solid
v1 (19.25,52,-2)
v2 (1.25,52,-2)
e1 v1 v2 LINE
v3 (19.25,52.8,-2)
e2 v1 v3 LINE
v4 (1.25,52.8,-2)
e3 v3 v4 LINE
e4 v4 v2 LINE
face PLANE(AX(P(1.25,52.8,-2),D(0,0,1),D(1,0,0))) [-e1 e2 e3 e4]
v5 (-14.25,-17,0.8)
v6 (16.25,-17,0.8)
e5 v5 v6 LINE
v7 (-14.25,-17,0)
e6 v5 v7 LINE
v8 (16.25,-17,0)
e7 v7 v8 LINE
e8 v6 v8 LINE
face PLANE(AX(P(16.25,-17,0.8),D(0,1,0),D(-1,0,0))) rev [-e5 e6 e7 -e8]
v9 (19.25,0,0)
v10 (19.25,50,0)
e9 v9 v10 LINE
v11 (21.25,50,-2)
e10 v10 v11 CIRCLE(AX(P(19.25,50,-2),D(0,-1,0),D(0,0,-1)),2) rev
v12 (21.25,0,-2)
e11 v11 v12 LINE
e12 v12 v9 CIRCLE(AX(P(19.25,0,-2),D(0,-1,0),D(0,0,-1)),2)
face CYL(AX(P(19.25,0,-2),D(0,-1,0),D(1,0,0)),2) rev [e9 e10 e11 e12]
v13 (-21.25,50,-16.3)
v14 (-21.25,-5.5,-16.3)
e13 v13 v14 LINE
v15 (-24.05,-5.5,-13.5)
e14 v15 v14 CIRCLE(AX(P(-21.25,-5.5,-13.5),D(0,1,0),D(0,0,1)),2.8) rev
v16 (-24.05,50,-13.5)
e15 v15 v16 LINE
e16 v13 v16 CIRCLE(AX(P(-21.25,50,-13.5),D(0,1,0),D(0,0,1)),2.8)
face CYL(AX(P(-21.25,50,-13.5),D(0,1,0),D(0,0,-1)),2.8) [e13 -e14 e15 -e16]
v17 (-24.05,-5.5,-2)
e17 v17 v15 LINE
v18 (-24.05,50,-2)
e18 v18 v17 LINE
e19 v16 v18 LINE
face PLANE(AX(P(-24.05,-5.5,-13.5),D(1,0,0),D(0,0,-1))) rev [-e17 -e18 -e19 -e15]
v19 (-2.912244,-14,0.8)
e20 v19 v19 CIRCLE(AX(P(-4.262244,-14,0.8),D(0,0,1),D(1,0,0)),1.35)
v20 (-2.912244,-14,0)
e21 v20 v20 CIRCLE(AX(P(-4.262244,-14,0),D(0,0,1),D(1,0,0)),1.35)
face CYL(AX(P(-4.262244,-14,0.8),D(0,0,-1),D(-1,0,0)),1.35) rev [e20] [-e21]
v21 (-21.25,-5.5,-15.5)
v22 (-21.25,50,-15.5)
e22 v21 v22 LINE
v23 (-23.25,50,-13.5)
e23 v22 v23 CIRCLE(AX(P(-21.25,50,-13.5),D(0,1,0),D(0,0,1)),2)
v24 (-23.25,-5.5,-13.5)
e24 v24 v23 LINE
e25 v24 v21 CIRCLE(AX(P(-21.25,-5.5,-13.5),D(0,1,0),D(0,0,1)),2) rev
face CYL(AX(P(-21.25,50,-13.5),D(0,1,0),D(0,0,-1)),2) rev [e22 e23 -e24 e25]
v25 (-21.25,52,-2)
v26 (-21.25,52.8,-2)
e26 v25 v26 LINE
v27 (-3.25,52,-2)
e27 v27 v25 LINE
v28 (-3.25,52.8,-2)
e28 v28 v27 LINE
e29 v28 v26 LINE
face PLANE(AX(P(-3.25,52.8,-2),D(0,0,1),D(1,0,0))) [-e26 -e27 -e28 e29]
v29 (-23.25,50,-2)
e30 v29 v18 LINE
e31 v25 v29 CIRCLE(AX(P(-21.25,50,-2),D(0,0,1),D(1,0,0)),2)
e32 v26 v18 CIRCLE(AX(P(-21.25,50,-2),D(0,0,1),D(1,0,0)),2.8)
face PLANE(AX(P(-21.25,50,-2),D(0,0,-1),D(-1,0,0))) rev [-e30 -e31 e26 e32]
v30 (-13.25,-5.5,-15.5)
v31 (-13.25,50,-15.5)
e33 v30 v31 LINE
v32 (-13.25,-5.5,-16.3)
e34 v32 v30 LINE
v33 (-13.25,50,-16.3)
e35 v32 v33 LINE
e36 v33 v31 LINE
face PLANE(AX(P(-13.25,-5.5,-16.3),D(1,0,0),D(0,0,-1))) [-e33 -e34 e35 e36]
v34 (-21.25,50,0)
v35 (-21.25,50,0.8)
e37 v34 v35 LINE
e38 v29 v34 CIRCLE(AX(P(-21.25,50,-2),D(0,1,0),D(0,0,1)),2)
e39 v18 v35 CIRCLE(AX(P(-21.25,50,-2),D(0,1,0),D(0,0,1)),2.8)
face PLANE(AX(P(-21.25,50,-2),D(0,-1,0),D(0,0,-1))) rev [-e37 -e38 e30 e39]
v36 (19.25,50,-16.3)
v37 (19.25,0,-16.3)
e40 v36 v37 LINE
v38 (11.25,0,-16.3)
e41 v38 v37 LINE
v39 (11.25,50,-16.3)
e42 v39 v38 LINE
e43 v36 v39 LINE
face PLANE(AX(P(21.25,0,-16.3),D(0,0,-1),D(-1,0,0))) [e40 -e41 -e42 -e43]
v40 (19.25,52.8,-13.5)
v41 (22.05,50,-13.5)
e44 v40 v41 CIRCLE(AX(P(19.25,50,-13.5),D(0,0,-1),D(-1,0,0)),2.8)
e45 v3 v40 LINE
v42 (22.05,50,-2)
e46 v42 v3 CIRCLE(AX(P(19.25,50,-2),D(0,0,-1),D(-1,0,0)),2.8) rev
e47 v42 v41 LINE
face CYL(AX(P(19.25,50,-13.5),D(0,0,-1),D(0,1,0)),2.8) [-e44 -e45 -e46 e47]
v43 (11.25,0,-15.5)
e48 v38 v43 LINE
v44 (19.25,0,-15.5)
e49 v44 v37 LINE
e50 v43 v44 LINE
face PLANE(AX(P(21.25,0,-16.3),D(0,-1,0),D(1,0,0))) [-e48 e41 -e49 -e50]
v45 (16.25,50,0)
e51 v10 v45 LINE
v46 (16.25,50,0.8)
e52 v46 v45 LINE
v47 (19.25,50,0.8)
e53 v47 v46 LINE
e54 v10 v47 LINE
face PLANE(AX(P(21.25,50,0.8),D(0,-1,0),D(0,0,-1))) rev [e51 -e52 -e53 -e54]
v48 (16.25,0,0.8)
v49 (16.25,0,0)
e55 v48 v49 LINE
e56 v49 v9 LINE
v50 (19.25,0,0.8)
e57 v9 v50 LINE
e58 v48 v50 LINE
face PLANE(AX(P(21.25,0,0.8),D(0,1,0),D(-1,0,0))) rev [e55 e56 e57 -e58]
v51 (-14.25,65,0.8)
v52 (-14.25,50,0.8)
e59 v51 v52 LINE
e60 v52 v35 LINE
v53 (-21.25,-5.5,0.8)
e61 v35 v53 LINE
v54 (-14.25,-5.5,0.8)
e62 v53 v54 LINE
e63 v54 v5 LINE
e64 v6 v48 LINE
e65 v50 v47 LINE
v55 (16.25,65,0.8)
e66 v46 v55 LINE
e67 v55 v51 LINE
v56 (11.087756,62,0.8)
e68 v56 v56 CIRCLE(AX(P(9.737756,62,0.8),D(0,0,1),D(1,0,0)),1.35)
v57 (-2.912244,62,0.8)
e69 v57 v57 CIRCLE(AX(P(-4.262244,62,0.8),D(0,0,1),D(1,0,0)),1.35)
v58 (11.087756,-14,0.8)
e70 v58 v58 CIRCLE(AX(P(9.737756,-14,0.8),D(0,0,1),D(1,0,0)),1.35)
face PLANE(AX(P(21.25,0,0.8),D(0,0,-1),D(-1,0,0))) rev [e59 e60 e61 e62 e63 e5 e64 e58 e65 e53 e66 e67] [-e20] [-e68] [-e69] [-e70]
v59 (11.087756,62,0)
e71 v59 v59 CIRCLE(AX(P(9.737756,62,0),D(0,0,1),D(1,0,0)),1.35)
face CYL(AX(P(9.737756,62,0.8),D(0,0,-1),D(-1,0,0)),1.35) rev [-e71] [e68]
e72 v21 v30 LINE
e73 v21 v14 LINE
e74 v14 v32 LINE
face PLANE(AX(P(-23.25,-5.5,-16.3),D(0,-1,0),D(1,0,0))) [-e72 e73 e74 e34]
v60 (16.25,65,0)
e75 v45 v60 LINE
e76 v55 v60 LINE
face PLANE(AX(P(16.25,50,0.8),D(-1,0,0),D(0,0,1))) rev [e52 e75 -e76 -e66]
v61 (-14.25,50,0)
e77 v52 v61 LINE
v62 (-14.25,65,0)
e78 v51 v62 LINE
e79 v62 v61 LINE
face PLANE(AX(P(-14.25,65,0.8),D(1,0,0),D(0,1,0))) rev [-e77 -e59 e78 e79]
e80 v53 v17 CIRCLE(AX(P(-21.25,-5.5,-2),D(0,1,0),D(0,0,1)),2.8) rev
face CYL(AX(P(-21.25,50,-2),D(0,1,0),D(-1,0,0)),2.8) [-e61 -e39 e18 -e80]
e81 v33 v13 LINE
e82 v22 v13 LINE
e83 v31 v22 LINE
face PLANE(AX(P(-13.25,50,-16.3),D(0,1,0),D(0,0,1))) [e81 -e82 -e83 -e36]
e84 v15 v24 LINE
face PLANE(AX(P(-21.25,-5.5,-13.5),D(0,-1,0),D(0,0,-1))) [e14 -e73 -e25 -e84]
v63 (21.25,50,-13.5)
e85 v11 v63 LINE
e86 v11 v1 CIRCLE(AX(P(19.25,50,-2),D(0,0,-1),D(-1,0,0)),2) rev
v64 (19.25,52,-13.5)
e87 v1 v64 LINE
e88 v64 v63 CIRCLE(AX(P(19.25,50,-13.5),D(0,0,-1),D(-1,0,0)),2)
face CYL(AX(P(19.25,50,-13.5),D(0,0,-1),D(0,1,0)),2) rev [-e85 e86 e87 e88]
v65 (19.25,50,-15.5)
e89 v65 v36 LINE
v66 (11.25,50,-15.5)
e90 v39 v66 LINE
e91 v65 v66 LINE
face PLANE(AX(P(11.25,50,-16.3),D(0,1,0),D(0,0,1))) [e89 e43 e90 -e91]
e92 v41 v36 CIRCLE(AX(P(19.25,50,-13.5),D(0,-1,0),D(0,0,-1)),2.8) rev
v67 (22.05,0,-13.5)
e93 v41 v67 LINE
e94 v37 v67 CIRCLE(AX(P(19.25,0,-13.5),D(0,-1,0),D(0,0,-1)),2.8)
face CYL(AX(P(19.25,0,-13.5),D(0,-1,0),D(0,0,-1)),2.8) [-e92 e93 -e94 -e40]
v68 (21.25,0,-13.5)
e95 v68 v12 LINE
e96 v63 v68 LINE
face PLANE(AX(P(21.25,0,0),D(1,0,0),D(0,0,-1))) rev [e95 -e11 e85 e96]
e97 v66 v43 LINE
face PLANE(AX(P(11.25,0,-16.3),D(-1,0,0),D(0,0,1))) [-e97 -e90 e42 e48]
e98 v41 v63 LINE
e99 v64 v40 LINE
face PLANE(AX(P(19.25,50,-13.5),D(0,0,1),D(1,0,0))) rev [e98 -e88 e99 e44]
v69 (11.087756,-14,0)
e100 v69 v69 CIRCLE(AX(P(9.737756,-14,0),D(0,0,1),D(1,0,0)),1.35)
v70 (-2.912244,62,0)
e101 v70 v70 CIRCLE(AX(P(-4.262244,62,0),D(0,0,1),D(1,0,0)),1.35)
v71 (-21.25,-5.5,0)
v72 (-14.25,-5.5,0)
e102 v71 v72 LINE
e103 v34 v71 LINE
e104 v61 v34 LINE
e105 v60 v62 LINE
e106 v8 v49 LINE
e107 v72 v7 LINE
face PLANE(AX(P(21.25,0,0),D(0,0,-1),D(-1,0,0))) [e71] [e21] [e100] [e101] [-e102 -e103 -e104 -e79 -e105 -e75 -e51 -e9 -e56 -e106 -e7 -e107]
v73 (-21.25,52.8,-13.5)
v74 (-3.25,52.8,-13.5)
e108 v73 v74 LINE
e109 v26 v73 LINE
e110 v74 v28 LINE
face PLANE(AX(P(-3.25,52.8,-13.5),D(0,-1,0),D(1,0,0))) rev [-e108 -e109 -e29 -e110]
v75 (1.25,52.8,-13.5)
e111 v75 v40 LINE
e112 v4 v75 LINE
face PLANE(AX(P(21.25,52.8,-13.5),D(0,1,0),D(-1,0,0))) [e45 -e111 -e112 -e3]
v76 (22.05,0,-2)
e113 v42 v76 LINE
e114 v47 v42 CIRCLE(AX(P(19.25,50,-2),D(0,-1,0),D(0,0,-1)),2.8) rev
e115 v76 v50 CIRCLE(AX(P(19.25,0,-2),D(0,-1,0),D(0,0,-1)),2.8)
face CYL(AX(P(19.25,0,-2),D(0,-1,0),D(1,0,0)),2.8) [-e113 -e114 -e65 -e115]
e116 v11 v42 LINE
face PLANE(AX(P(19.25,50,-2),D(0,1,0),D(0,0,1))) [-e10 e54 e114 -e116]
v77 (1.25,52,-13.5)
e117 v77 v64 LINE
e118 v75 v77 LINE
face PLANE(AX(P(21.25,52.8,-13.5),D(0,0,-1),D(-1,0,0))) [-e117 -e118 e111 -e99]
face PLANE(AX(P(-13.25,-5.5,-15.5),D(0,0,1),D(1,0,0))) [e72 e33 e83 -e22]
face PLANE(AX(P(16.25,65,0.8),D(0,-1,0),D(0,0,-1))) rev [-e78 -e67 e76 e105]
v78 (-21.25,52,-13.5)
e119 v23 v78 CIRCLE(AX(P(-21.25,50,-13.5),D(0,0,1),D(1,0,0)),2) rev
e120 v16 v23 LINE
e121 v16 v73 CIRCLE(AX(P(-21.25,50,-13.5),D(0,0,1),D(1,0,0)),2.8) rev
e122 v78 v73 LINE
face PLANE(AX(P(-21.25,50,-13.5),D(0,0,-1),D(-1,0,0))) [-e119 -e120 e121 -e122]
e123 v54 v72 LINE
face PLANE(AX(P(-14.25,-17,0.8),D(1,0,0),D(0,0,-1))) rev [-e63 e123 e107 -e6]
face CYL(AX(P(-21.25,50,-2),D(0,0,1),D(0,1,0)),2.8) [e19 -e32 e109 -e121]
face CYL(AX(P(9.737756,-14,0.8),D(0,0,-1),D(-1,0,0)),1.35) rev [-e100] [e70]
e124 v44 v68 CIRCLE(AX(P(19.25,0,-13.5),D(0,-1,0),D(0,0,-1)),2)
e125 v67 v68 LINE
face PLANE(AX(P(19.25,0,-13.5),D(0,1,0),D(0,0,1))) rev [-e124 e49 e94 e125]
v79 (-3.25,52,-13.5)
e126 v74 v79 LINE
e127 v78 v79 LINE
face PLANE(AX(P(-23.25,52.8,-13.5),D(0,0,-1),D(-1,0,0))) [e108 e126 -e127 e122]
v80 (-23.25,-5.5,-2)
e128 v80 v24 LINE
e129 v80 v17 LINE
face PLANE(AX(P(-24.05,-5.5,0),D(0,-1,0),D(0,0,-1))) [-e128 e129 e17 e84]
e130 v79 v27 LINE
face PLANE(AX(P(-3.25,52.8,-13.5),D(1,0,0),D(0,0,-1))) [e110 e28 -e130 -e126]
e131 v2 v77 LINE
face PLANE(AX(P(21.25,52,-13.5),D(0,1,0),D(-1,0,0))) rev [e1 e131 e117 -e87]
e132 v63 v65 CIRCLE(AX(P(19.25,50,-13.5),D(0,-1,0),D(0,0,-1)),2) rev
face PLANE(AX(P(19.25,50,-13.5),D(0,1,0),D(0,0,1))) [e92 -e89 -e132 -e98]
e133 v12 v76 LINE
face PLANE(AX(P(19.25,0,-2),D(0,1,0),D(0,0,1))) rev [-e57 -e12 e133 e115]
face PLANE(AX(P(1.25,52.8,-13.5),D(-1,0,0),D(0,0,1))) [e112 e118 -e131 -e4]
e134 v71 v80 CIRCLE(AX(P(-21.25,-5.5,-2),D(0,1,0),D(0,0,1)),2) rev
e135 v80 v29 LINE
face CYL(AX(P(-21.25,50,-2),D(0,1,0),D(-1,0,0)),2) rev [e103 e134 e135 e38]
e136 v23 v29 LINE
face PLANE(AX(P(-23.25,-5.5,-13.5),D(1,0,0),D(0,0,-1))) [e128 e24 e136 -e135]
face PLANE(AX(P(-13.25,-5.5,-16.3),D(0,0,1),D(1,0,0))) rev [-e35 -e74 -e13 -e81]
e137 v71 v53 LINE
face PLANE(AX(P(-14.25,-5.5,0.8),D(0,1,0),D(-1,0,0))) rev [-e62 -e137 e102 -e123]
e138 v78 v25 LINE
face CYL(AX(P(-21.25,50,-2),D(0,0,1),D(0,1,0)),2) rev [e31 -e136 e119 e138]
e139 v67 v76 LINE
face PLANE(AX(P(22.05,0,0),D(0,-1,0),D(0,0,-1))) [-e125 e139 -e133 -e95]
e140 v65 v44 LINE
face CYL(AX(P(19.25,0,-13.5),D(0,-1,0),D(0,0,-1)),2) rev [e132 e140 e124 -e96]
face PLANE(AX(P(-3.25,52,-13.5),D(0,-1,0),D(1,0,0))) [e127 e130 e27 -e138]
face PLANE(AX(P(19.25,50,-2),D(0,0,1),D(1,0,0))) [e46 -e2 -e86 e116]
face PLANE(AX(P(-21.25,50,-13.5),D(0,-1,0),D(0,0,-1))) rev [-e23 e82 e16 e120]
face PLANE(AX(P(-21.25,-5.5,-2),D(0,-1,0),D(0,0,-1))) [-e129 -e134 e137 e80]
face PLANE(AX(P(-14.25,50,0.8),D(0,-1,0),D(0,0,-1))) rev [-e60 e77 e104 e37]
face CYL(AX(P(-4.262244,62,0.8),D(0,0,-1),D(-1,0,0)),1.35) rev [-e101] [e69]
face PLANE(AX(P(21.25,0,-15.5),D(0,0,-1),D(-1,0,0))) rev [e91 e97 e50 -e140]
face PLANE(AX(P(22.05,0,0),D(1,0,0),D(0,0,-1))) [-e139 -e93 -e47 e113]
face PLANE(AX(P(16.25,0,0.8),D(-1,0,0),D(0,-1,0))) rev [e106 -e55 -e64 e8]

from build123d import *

# Parameters (mm, degrees)
SKETCH1_R                      = 1.35
BASE_FLANGE1_DEPTH             = 0.8
EDGE_FLANGE1_STRIP_W           = 7.2
EDGE_FLANGE1_STRIP_H           = 0.8
EDGE_FLANGE1_STRIP_CUT_DEPTH   = 50
EDGE_FLANGE1_STRIP_2_W         = 7.2
EDGE_FLANGE1_STRIP_2_H         = 0.8
EDGE_FLANGE1_STRIP_CUT_2_DEPTH = 55.5
EDGE_FLANGE1_DEPTH             = 50
EDGE_FLANGE1_BEND_DEPTH        = 55.5
EDGE_FLANGE4_DEPTH             = 11.5
EDGE_FLANGE4_BEND_DEPTH        = 11.5
EDGE_FLANGE5_DEPTH             = 50
EDGE_FLANGE5_BEND_DEPTH        = 55.5


# Sheet-metal steps are written as plain solids
with BuildPart() as part:
    # Sketch1 → Base-Flange1 (new body)
    with BuildSketch(Plane.XY):
        Polygon((16.25, 0), (16.25, -17), (-14.25, -17), (-14.25, -5.5), (-23.25, -5.5), (-23.25, 50), (-14.25, 50), (-14.25, 65), (16.25, 65), (16.25, 50), (21.25, 50), (21.25, 0), align=None)
        with Locations((9.737756115, -14)):
            Circle(SKETCH1_R, mode=Mode.SUBTRACT)
        with Locations((-4.262243885, -14)):
            Circle(SKETCH1_R, mode=Mode.SUBTRACT)
        with Locations((9.737756115, 62)):
            Circle(SKETCH1_R, mode=Mode.SUBTRACT)
        with Locations((-4.262243885, 62)):
            Circle(SKETCH1_R, mode=Mode.SUBTRACT)
    extrude(amount=BASE_FLANGE1_DEPTH)

    # Edge-Flange1 strip (across the edge) → Edge-Flange1 strip cut (cut)
    with BuildSketch(Plane(origin=(21.25, 50, 0), x_dir=(-1, 0, 0), z_dir=(0, -1, 0))):
        with Locations((-1.6, -0.4)):
            Rectangle(EDGE_FLANGE1_STRIP_W, EDGE_FLANGE1_STRIP_H)
    extrude(amount=EDGE_FLANGE1_STRIP_CUT_DEPTH, mode=Mode.SUBTRACT)

    # Edge-Flange1 strip 2 (across the edge) → Edge-Flange1 strip cut 2 (cut)
    with BuildSketch(Plane(origin=(-23.25, -5.5, 0), x_dir=(1, 0, 0), z_dir=(0, 1, 0))):
        with Locations((-1.6, -0.4)):
            Rectangle(EDGE_FLANGE1_STRIP_2_W, EDGE_FLANGE1_STRIP_2_H)
    extrude(amount=EDGE_FLANGE1_STRIP_CUT_2_DEPTH, mode=Mode.SUBTRACT)

    # Edge-Flange1 section (across the edge) → Edge-Flange1 (add)
    with BuildSketch(Plane(origin=(21.25, 50, 0), x_dir=(-1, 0, 0), z_dir=(0, -1, 0))):
        with BuildLine():
            Line((-0.8, 2), (-0.8, 13.5))
            Line((-0.8, 13.5), (0, 13.5))
            Line((0, 13.5), (0, 2))
            ThreePointArc((0, 2), (0.585786438, 0.585786438), (2, 0))
            Line((2, 0), (2, -0.8))
            ThreePointArc((2, -0.8), (0.020101013, 0.020101013), (-0.8, 2))
        make_face()
    extrude(amount=EDGE_FLANGE1_DEPTH)

    # Edge-Flange1 section 2 (across the edge) → Edge-Flange1 bend (add)
    with BuildSketch(Plane(origin=(-23.25, -5.5, 0), x_dir=(1, 0, 0), z_dir=(0, 1, 0))):
        with BuildLine():
            Line((-0.8, 2), (-0.8, 13.5))
            Line((-0.8, 13.5), (0, 13.5))
            Line((0, 13.5), (0, 2))
            ThreePointArc((0, 2), (0.585786438, 0.585786438), (2, 0))
            Line((2, 0), (2, -0.8))
            ThreePointArc((2, -0.8), (0.020101013, 0.020101013), (-0.8, 2))
        make_face()
    extrude(amount=EDGE_FLANGE1_BEND_DEPTH)

    # Edge-Flange4 section (across the edge) → Edge-Flange4 (add)
    with BuildSketch(Plane(origin=(21.25, 52, -2), x_dir=(0, -1, 0), z_dir=(0, 0, -1))):
        with BuildLine():
            Line((-0.8, 2), (-0.8, 20))
            Line((-0.8, 20), (0, 20))
            Line((0, 20), (0, 2))
            ThreePointArc((0, 2), (0.585786438, 0.585786438), (2, 0))
            Line((2, 0), (2, -0.8))
            ThreePointArc((2, -0.8), (0.020101013, 0.020101013), (-0.8, 2))
        make_face()
    extrude(amount=EDGE_FLANGE4_DEPTH)

    # Edge-Flange4 section 2 (across the edge) → Edge-Flange4 bend (add)
    with BuildSketch(Plane(origin=(-23.25, 52, -13.5), x_dir=(0, -1, 0), z_dir=(0, 0, 1))):
        with BuildLine():
            Line((-0.8, 2), (-0.8, 20))
            Line((-0.8, 20), (0, 20))
            Line((0, 20), (0, 2))
            ThreePointArc((0, 2), (0.585786438, 0.585786438), (2, 0))
            Line((2, 0), (2, -0.8))
            ThreePointArc((2, -0.8), (0.020101013, 0.020101013), (-0.8, 2))
        make_face()
    extrude(amount=EDGE_FLANGE4_BEND_DEPTH)

    # Edge-Flange5 section (across the edge) → Edge-Flange5 (add)
    with BuildSketch(Plane(origin=(21.25, 50, -15.5), x_dir=(0, 0, 1), z_dir=(0, -1, 0))):
        with BuildLine():
            Line((-0.8, 2), (-0.8, 10))
            Line((-0.8, 10), (0, 10))
            Line((0, 10), (0, 2))
            ThreePointArc((0, 2), (0.585786438, 0.585786438), (2, 0))
            Line((2, 0), (2, -0.8))
            ThreePointArc((2, -0.8), (0.020101013, 0.020101013), (-0.8, 2))
        make_face()
    extrude(amount=EDGE_FLANGE5_DEPTH)

    # Edge-Flange5 section 2 (across the edge) → Edge-Flange5 bend (add)
    with BuildSketch(Plane(origin=(-23.25, -5.5, -15.5), x_dir=(0, 0, 1), z_dir=(0, 1, 0))):
        with BuildLine():
            Line((-0.8, 2), (-0.8, 10))
            Line((-0.8, 10), (0, 10))
            Line((0, 10), (0, 2))
            ThreePointArc((0, 2), (0.585786438, 0.585786438), (2, 0))
            Line((2, 0), (2, -0.8))
            ThreePointArc((2, -0.8), (0.020101013, 0.020101013), (-0.8, 2))
        make_face()
    extrude(amount=EDGE_FLANGE5_BEND_DEPTH)


solid = part.part
